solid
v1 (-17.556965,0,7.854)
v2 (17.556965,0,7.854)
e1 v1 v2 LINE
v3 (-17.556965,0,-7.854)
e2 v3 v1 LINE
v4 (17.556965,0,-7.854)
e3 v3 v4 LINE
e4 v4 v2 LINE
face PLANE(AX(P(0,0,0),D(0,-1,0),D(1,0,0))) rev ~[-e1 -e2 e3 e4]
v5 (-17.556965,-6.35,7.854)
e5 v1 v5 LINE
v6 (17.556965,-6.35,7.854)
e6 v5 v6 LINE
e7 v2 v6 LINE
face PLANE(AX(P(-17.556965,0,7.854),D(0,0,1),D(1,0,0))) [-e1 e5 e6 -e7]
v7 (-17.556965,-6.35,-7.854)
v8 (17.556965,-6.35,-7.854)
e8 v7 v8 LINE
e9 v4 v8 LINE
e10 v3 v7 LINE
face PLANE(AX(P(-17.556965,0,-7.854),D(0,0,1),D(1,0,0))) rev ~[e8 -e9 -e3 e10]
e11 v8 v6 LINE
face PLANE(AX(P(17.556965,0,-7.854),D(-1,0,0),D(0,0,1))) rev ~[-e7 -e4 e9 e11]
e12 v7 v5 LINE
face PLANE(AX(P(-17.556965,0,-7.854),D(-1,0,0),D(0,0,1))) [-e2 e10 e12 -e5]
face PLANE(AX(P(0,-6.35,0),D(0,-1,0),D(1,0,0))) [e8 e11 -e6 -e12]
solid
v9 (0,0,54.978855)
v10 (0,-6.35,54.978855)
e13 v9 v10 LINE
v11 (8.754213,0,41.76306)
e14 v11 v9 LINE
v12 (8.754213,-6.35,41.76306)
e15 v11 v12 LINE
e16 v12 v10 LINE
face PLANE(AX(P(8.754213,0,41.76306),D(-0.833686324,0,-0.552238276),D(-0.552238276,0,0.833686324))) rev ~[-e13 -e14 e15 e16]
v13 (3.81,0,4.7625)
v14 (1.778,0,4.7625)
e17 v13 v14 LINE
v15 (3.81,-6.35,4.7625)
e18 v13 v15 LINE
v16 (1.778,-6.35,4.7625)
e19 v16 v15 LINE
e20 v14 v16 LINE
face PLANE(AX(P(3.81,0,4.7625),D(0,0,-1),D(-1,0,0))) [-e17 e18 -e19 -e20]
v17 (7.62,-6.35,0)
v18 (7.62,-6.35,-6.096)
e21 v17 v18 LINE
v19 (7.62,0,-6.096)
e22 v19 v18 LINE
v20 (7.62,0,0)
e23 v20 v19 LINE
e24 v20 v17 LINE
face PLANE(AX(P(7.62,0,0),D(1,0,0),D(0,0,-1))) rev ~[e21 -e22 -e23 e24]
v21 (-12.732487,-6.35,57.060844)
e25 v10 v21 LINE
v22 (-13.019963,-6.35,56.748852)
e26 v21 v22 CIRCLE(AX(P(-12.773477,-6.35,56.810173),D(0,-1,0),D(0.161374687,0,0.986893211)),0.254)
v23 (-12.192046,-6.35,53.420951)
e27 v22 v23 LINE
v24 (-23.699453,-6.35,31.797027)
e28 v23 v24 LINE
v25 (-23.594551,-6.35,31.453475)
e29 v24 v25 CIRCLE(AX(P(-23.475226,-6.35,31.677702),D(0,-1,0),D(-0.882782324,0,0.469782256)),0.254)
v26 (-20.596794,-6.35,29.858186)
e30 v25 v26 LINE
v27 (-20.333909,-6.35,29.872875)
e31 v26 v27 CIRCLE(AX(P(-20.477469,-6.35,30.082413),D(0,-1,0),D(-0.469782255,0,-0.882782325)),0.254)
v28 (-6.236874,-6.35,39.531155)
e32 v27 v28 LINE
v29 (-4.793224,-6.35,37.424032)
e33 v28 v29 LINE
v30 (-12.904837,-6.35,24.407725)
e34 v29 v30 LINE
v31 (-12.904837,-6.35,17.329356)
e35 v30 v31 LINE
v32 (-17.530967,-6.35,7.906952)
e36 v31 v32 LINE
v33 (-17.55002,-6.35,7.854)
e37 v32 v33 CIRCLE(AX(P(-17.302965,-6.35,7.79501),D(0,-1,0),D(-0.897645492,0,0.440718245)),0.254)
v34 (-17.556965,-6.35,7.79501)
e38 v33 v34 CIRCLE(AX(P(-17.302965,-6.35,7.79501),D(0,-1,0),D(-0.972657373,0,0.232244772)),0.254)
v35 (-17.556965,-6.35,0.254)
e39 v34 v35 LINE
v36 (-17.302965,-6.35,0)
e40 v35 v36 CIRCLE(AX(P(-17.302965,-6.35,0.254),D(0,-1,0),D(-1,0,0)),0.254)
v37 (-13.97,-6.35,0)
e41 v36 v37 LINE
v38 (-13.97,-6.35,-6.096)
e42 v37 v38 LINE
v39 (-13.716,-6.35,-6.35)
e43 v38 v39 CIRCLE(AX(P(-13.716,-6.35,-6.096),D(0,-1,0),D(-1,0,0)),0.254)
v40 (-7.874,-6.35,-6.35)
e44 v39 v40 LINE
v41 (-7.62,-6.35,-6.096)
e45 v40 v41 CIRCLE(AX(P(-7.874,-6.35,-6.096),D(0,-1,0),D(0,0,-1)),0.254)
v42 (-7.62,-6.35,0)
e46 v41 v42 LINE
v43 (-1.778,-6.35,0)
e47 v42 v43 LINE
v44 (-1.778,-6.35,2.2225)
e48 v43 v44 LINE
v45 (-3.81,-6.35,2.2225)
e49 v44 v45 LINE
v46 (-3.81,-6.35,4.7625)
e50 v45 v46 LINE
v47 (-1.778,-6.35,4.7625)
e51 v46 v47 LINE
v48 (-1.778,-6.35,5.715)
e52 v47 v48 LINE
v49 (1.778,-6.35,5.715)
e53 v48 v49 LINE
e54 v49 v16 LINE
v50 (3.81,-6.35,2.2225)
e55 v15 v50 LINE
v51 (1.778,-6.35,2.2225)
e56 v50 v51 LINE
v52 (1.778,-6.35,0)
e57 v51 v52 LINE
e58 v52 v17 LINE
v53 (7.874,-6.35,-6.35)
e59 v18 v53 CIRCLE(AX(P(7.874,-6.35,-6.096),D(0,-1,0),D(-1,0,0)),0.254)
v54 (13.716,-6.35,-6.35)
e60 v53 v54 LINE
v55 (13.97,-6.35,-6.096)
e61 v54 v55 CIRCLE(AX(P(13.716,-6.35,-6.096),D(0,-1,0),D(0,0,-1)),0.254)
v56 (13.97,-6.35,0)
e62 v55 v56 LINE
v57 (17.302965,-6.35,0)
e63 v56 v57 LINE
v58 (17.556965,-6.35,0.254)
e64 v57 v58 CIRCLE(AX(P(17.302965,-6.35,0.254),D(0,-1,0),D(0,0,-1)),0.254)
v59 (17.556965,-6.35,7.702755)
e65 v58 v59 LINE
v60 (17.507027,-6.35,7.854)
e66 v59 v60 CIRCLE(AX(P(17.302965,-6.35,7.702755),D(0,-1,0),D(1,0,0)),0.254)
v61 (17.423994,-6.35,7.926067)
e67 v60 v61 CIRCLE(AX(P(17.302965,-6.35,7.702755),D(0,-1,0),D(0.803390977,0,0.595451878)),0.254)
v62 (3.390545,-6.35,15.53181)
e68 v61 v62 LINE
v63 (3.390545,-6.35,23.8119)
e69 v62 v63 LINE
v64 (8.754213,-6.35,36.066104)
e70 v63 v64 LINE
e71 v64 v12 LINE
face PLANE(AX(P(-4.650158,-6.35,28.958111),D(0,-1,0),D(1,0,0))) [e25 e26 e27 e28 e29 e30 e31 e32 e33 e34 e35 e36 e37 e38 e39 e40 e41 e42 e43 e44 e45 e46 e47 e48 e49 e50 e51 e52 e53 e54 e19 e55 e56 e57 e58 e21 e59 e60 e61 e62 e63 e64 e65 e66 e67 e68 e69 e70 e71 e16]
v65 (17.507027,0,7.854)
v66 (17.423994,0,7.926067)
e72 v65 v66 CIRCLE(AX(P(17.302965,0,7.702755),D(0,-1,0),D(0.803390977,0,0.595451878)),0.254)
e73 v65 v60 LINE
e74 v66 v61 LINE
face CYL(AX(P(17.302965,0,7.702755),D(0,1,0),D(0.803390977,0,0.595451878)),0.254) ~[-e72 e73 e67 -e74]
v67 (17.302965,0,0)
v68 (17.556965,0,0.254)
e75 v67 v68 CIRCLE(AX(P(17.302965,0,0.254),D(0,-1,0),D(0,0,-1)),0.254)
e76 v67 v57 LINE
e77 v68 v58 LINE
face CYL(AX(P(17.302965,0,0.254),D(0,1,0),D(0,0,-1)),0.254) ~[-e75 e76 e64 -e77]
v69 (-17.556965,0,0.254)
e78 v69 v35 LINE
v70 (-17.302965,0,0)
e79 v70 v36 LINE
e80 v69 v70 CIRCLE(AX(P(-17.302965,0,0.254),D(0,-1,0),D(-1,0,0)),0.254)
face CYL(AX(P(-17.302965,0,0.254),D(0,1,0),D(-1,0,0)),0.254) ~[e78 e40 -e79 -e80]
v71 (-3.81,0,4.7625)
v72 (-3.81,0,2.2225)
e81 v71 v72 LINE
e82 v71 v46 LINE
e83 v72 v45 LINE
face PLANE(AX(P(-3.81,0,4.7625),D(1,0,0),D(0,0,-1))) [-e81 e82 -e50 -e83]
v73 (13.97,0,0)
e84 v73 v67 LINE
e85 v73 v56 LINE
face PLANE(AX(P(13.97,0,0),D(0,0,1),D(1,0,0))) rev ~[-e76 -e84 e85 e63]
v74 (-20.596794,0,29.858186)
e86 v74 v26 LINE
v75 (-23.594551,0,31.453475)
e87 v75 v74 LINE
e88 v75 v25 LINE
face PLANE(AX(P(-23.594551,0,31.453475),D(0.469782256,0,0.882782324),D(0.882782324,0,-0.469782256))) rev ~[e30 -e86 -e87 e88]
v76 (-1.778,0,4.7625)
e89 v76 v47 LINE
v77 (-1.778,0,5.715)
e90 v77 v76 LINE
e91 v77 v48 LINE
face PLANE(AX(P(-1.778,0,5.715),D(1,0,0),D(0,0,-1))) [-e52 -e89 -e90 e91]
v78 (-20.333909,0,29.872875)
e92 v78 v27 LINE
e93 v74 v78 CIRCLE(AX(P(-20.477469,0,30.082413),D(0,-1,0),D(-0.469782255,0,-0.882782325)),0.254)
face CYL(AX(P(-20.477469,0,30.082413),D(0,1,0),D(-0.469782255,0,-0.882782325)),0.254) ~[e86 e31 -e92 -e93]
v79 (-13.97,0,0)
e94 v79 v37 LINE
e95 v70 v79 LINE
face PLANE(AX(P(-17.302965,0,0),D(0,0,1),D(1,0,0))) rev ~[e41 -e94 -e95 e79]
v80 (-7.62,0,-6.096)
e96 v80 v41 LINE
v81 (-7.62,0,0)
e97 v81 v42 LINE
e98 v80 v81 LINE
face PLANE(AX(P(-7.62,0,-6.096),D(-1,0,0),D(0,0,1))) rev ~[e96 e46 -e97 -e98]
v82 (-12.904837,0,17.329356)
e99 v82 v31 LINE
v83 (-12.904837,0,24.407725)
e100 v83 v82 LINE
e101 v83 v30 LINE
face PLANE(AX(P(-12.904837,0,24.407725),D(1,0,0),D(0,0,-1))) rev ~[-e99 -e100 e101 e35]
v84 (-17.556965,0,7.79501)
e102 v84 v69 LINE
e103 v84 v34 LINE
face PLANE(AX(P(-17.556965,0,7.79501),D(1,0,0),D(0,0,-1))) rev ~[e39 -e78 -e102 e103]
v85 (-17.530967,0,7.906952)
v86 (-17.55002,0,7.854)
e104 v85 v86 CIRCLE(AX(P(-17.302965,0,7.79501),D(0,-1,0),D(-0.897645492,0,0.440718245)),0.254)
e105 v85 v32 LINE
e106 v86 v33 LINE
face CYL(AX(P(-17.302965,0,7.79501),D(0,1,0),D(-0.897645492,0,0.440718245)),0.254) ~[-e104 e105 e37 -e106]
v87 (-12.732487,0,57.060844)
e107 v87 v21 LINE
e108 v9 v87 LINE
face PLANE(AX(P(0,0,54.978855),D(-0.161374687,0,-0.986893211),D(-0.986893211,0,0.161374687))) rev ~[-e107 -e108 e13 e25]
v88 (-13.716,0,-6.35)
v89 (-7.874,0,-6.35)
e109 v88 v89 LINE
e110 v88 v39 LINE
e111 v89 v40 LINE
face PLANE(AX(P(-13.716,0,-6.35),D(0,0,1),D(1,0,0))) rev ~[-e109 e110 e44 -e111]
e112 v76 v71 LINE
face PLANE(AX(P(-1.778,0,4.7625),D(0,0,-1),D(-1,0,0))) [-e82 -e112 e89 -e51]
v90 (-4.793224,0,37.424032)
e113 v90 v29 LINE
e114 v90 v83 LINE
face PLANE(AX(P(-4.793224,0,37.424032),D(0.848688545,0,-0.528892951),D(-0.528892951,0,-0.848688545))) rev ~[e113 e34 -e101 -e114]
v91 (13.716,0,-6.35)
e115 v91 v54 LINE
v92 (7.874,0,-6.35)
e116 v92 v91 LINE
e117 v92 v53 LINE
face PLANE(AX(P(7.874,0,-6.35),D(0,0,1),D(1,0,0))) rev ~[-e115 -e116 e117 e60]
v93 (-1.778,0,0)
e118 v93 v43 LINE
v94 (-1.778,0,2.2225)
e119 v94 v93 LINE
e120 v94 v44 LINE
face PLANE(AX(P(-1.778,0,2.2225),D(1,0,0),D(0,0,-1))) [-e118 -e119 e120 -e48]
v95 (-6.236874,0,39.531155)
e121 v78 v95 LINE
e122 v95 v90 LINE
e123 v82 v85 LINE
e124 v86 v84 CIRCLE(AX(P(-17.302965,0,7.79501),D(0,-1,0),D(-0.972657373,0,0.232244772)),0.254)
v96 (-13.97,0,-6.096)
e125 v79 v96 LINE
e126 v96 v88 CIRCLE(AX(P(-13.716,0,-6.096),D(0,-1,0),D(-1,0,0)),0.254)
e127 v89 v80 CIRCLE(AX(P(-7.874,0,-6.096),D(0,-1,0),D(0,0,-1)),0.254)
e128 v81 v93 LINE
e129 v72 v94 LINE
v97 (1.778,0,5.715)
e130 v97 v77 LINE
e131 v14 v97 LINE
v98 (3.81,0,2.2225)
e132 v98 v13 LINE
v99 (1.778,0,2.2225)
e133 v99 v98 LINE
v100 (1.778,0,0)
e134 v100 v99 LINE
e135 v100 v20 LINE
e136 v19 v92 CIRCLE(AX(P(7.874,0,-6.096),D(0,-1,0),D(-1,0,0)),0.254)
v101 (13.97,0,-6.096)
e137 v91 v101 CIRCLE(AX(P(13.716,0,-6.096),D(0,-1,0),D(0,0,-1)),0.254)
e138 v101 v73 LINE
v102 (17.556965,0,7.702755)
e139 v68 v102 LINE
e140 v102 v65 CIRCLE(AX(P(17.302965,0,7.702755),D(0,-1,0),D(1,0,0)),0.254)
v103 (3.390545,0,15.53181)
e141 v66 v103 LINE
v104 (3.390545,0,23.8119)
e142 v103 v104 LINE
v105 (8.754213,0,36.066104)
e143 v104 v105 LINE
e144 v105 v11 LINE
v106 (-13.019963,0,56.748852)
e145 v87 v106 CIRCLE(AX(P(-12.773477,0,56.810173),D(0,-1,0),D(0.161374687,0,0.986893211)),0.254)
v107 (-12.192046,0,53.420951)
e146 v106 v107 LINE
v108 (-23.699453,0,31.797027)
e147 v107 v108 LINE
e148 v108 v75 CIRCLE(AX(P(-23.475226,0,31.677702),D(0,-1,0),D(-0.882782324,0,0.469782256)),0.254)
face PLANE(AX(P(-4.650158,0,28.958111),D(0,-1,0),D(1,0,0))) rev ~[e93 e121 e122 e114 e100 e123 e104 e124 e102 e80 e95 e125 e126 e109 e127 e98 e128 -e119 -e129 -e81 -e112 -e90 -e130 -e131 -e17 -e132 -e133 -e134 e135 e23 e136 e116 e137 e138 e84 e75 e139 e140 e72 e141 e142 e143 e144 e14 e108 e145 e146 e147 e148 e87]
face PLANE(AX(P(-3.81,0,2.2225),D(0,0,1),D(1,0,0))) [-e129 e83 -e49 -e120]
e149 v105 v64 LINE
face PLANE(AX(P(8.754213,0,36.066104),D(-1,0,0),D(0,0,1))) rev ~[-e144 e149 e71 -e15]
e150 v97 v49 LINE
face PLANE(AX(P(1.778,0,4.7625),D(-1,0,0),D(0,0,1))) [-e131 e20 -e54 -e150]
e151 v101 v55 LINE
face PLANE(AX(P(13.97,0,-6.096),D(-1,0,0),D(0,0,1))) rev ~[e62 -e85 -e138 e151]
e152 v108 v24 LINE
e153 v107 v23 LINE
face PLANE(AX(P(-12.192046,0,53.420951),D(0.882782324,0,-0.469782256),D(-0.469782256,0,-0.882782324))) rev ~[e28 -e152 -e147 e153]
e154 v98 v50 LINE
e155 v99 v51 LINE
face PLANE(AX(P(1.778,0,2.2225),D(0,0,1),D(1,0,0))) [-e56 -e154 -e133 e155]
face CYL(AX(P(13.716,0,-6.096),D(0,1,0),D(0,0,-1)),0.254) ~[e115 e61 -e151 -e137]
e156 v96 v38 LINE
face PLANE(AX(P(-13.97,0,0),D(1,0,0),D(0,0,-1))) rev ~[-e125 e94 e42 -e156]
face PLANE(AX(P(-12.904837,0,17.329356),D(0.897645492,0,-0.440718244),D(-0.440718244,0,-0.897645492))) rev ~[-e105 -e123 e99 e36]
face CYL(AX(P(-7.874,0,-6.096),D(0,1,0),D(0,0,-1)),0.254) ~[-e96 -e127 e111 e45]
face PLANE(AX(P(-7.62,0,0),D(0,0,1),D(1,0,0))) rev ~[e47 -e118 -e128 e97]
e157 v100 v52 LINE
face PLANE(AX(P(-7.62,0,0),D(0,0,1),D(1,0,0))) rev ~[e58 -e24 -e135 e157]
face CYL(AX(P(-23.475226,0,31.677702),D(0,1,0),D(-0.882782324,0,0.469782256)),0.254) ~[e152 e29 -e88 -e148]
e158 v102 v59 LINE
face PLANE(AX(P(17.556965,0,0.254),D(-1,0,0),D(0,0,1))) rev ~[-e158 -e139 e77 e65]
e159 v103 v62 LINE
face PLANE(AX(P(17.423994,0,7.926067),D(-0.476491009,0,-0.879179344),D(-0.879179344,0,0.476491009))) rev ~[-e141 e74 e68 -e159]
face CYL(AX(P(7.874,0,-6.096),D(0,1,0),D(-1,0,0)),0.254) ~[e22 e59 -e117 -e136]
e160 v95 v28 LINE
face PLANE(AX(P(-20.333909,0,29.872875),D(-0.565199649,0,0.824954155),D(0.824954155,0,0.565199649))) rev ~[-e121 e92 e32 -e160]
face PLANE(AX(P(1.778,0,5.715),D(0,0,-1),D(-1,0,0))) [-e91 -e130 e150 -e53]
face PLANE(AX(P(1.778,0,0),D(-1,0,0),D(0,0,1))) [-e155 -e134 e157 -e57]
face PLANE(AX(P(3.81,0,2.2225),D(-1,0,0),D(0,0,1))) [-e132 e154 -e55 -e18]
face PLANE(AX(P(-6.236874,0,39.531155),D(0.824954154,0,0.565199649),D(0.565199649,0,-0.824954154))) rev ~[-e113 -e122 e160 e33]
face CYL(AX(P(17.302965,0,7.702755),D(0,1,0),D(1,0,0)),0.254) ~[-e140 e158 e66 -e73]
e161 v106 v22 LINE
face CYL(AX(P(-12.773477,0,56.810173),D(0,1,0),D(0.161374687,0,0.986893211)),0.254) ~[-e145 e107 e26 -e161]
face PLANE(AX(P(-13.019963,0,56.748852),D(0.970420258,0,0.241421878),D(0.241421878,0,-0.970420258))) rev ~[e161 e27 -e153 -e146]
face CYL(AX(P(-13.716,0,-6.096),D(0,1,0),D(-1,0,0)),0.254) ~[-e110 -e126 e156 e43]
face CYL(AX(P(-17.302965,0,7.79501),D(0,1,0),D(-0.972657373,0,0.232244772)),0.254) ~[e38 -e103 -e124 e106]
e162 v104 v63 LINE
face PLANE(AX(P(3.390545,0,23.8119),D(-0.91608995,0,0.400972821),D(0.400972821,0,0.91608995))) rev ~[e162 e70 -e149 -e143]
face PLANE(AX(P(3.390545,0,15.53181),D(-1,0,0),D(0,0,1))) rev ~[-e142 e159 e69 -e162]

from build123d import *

# Parameters (mm, degrees)
F0_W     = 35.1139307306
F0_H     = 15.7079994678
F1_DEPTH = 6.35
F3_DEPTH = 6.35
F5_DEPTH = 25.4


with BuildPart() as f1:
    # F0 (on Front) → F1 (new body)
    with BuildSketch(Plane.XZ):
        Rectangle(F0_W, F0_H)
    extrude(amount=F1_DEPTH)


with BuildPart() as f3:
    # F2 (on face) → F3 (new body)
    with BuildSketch(Plane.XZ):
        with BuildLine():
            Line((-12.9048367962, 17.3293557018), (-17.5309673203, 7.9069519959))
            ThreePointArc((-17.5309673203, 7.9069519959), (-17.5419648563, 7.8810051625), (-17.5500203382, 7.8539997339))
            Line((-17.5500203382, 7.8539997339), (17.5070266734, 7.8539997339))
            ThreePointArc((17.5070266734, 7.8539997339), (17.4694564643, 7.8945796529), (17.4239940816, 7.9260665103))
            Line((17.4239940816, 7.9260665103), (3.3905450255, 15.5318096953))
            Line((3.3905450255, 15.5318096953), (3.3905450255, 23.8119002209))
            Line((3.3905450255, 23.8119002209), (8.7542133406, 36.0661039488))
            Line((8.7542133406, 36.0661039488), (8.7542133406, 41.7630597949))
            Line((8.7542133406, 41.7630597949), (0, 54.9788549542))
            Line((0, 54.9788549542), (-12.7324874569, 57.0608443233))
            ThreePointArc((-12.7324874569, 57.0608443233), (-12.9602708202, 56.9822894828), (-13.0199633728, 56.7488522906))
            Line((-13.0199633728, 56.7488522906), (-12.1920456474, 53.4209511994))
            Line((-12.1920456474, 53.4209511994), (-23.6994531811, 31.79702684))
            ThreePointArc((-23.6994531811, 31.79702684), (-23.7181539978, 31.6035252192), (-23.5945511638, 31.4534754366))
            Line((-23.5945511638, 31.4534754366), (-20.5967939678, 29.858186202))
            ThreePointArc((-20.5967939678, 29.858186202), (-20.4632994801, 29.8288084627), (-20.333908564, 29.8728745571))
            Line((-20.333908564, 29.8728745571), (-6.2368744391, 39.5311551932))
            Line((-6.2368744391, 39.5311551932), (-4.7932239249, 37.4240316451))
            Line((-4.7932239249, 37.4240316451), (-12.9048367962, 24.4077248131))
            Line((-12.9048367962, 24.4077248131), (-12.9048367962, 17.3293557018))
        make_face()
        with BuildLine():
            Line((17.5070266734, 7.8539997339), (-17.5500203382, 7.8539997339))
            ThreePointArc((-17.5500203382, 7.8539997339), (-17.5552231334, 7.8247083574), (-17.5569653653, 7.795009562))
            Line((-17.5569653653, 7.795009562), (-17.5569653653, 0.254))
            ThreePointArc((-17.5569653653, 0.254), (-17.4825704877, 0.0743948776), (-17.3029653653, 0))
            Line((-17.3029653653, 0), (-13.97, 0))
            Line((-13.97, 0), (-13.97, -6.096))
            ThreePointArc((-13.97, -6.096), (-13.8956051224, -6.2756051224), (-13.716, -6.35))
            Line((-13.716, -6.35), (-7.874, -6.35))
            ThreePointArc((-7.874, -6.35), (-7.6943948776, -6.2756051224), (-7.62, -6.096))
            Line((-7.62, -6.096), (-7.62, 0))
            Line((-7.62, 0), (7.62, 0))
            Line((7.62, 0), (7.62, -6.096))
            ThreePointArc((7.62, -6.096), (7.6943948776, -6.2756051224), (7.874, -6.35))
            Line((7.874, -6.35), (13.716, -6.35))
            ThreePointArc((13.716, -6.35), (13.8956051224, -6.2756051224), (13.97, -6.096))
            Line((13.97, -6.096), (13.97, 0))
            Line((13.97, 0), (17.3029653653, 0))
            ThreePointArc((17.3029653653, 0), (17.4825704877, 0.0743948776), (17.5569653653, 0.254))
            Line((17.5569653653, 0.254), (17.5569653653, 7.702754957))
            ThreePointArc((17.5569653653, 7.702754957), (17.5441577908, 7.7823929748), (17.5070266734, 7.8539997339))
        make_face()
    extrude(amount=F3_DEPTH)

    # F4 (on Front) → F5 (cut)
    with BuildSketch(Plane.XZ):
        Polygon((1.778, 5.715), (-1.778, 5.715), (-1.778, 4.7625), (-3.81, 4.7625), (-3.81, 2.2225), (-1.778, 2.2225), (-1.778, 0), (1.778, 0), (1.778, 2.2225), (3.81, 2.2225), (3.81, 4.7625), (1.778, 4.7625), align=None)
    extrude(amount=F5_DEPTH, mode=Mode.SUBTRACT)


solid = Compound([f1.part, f3.part])
